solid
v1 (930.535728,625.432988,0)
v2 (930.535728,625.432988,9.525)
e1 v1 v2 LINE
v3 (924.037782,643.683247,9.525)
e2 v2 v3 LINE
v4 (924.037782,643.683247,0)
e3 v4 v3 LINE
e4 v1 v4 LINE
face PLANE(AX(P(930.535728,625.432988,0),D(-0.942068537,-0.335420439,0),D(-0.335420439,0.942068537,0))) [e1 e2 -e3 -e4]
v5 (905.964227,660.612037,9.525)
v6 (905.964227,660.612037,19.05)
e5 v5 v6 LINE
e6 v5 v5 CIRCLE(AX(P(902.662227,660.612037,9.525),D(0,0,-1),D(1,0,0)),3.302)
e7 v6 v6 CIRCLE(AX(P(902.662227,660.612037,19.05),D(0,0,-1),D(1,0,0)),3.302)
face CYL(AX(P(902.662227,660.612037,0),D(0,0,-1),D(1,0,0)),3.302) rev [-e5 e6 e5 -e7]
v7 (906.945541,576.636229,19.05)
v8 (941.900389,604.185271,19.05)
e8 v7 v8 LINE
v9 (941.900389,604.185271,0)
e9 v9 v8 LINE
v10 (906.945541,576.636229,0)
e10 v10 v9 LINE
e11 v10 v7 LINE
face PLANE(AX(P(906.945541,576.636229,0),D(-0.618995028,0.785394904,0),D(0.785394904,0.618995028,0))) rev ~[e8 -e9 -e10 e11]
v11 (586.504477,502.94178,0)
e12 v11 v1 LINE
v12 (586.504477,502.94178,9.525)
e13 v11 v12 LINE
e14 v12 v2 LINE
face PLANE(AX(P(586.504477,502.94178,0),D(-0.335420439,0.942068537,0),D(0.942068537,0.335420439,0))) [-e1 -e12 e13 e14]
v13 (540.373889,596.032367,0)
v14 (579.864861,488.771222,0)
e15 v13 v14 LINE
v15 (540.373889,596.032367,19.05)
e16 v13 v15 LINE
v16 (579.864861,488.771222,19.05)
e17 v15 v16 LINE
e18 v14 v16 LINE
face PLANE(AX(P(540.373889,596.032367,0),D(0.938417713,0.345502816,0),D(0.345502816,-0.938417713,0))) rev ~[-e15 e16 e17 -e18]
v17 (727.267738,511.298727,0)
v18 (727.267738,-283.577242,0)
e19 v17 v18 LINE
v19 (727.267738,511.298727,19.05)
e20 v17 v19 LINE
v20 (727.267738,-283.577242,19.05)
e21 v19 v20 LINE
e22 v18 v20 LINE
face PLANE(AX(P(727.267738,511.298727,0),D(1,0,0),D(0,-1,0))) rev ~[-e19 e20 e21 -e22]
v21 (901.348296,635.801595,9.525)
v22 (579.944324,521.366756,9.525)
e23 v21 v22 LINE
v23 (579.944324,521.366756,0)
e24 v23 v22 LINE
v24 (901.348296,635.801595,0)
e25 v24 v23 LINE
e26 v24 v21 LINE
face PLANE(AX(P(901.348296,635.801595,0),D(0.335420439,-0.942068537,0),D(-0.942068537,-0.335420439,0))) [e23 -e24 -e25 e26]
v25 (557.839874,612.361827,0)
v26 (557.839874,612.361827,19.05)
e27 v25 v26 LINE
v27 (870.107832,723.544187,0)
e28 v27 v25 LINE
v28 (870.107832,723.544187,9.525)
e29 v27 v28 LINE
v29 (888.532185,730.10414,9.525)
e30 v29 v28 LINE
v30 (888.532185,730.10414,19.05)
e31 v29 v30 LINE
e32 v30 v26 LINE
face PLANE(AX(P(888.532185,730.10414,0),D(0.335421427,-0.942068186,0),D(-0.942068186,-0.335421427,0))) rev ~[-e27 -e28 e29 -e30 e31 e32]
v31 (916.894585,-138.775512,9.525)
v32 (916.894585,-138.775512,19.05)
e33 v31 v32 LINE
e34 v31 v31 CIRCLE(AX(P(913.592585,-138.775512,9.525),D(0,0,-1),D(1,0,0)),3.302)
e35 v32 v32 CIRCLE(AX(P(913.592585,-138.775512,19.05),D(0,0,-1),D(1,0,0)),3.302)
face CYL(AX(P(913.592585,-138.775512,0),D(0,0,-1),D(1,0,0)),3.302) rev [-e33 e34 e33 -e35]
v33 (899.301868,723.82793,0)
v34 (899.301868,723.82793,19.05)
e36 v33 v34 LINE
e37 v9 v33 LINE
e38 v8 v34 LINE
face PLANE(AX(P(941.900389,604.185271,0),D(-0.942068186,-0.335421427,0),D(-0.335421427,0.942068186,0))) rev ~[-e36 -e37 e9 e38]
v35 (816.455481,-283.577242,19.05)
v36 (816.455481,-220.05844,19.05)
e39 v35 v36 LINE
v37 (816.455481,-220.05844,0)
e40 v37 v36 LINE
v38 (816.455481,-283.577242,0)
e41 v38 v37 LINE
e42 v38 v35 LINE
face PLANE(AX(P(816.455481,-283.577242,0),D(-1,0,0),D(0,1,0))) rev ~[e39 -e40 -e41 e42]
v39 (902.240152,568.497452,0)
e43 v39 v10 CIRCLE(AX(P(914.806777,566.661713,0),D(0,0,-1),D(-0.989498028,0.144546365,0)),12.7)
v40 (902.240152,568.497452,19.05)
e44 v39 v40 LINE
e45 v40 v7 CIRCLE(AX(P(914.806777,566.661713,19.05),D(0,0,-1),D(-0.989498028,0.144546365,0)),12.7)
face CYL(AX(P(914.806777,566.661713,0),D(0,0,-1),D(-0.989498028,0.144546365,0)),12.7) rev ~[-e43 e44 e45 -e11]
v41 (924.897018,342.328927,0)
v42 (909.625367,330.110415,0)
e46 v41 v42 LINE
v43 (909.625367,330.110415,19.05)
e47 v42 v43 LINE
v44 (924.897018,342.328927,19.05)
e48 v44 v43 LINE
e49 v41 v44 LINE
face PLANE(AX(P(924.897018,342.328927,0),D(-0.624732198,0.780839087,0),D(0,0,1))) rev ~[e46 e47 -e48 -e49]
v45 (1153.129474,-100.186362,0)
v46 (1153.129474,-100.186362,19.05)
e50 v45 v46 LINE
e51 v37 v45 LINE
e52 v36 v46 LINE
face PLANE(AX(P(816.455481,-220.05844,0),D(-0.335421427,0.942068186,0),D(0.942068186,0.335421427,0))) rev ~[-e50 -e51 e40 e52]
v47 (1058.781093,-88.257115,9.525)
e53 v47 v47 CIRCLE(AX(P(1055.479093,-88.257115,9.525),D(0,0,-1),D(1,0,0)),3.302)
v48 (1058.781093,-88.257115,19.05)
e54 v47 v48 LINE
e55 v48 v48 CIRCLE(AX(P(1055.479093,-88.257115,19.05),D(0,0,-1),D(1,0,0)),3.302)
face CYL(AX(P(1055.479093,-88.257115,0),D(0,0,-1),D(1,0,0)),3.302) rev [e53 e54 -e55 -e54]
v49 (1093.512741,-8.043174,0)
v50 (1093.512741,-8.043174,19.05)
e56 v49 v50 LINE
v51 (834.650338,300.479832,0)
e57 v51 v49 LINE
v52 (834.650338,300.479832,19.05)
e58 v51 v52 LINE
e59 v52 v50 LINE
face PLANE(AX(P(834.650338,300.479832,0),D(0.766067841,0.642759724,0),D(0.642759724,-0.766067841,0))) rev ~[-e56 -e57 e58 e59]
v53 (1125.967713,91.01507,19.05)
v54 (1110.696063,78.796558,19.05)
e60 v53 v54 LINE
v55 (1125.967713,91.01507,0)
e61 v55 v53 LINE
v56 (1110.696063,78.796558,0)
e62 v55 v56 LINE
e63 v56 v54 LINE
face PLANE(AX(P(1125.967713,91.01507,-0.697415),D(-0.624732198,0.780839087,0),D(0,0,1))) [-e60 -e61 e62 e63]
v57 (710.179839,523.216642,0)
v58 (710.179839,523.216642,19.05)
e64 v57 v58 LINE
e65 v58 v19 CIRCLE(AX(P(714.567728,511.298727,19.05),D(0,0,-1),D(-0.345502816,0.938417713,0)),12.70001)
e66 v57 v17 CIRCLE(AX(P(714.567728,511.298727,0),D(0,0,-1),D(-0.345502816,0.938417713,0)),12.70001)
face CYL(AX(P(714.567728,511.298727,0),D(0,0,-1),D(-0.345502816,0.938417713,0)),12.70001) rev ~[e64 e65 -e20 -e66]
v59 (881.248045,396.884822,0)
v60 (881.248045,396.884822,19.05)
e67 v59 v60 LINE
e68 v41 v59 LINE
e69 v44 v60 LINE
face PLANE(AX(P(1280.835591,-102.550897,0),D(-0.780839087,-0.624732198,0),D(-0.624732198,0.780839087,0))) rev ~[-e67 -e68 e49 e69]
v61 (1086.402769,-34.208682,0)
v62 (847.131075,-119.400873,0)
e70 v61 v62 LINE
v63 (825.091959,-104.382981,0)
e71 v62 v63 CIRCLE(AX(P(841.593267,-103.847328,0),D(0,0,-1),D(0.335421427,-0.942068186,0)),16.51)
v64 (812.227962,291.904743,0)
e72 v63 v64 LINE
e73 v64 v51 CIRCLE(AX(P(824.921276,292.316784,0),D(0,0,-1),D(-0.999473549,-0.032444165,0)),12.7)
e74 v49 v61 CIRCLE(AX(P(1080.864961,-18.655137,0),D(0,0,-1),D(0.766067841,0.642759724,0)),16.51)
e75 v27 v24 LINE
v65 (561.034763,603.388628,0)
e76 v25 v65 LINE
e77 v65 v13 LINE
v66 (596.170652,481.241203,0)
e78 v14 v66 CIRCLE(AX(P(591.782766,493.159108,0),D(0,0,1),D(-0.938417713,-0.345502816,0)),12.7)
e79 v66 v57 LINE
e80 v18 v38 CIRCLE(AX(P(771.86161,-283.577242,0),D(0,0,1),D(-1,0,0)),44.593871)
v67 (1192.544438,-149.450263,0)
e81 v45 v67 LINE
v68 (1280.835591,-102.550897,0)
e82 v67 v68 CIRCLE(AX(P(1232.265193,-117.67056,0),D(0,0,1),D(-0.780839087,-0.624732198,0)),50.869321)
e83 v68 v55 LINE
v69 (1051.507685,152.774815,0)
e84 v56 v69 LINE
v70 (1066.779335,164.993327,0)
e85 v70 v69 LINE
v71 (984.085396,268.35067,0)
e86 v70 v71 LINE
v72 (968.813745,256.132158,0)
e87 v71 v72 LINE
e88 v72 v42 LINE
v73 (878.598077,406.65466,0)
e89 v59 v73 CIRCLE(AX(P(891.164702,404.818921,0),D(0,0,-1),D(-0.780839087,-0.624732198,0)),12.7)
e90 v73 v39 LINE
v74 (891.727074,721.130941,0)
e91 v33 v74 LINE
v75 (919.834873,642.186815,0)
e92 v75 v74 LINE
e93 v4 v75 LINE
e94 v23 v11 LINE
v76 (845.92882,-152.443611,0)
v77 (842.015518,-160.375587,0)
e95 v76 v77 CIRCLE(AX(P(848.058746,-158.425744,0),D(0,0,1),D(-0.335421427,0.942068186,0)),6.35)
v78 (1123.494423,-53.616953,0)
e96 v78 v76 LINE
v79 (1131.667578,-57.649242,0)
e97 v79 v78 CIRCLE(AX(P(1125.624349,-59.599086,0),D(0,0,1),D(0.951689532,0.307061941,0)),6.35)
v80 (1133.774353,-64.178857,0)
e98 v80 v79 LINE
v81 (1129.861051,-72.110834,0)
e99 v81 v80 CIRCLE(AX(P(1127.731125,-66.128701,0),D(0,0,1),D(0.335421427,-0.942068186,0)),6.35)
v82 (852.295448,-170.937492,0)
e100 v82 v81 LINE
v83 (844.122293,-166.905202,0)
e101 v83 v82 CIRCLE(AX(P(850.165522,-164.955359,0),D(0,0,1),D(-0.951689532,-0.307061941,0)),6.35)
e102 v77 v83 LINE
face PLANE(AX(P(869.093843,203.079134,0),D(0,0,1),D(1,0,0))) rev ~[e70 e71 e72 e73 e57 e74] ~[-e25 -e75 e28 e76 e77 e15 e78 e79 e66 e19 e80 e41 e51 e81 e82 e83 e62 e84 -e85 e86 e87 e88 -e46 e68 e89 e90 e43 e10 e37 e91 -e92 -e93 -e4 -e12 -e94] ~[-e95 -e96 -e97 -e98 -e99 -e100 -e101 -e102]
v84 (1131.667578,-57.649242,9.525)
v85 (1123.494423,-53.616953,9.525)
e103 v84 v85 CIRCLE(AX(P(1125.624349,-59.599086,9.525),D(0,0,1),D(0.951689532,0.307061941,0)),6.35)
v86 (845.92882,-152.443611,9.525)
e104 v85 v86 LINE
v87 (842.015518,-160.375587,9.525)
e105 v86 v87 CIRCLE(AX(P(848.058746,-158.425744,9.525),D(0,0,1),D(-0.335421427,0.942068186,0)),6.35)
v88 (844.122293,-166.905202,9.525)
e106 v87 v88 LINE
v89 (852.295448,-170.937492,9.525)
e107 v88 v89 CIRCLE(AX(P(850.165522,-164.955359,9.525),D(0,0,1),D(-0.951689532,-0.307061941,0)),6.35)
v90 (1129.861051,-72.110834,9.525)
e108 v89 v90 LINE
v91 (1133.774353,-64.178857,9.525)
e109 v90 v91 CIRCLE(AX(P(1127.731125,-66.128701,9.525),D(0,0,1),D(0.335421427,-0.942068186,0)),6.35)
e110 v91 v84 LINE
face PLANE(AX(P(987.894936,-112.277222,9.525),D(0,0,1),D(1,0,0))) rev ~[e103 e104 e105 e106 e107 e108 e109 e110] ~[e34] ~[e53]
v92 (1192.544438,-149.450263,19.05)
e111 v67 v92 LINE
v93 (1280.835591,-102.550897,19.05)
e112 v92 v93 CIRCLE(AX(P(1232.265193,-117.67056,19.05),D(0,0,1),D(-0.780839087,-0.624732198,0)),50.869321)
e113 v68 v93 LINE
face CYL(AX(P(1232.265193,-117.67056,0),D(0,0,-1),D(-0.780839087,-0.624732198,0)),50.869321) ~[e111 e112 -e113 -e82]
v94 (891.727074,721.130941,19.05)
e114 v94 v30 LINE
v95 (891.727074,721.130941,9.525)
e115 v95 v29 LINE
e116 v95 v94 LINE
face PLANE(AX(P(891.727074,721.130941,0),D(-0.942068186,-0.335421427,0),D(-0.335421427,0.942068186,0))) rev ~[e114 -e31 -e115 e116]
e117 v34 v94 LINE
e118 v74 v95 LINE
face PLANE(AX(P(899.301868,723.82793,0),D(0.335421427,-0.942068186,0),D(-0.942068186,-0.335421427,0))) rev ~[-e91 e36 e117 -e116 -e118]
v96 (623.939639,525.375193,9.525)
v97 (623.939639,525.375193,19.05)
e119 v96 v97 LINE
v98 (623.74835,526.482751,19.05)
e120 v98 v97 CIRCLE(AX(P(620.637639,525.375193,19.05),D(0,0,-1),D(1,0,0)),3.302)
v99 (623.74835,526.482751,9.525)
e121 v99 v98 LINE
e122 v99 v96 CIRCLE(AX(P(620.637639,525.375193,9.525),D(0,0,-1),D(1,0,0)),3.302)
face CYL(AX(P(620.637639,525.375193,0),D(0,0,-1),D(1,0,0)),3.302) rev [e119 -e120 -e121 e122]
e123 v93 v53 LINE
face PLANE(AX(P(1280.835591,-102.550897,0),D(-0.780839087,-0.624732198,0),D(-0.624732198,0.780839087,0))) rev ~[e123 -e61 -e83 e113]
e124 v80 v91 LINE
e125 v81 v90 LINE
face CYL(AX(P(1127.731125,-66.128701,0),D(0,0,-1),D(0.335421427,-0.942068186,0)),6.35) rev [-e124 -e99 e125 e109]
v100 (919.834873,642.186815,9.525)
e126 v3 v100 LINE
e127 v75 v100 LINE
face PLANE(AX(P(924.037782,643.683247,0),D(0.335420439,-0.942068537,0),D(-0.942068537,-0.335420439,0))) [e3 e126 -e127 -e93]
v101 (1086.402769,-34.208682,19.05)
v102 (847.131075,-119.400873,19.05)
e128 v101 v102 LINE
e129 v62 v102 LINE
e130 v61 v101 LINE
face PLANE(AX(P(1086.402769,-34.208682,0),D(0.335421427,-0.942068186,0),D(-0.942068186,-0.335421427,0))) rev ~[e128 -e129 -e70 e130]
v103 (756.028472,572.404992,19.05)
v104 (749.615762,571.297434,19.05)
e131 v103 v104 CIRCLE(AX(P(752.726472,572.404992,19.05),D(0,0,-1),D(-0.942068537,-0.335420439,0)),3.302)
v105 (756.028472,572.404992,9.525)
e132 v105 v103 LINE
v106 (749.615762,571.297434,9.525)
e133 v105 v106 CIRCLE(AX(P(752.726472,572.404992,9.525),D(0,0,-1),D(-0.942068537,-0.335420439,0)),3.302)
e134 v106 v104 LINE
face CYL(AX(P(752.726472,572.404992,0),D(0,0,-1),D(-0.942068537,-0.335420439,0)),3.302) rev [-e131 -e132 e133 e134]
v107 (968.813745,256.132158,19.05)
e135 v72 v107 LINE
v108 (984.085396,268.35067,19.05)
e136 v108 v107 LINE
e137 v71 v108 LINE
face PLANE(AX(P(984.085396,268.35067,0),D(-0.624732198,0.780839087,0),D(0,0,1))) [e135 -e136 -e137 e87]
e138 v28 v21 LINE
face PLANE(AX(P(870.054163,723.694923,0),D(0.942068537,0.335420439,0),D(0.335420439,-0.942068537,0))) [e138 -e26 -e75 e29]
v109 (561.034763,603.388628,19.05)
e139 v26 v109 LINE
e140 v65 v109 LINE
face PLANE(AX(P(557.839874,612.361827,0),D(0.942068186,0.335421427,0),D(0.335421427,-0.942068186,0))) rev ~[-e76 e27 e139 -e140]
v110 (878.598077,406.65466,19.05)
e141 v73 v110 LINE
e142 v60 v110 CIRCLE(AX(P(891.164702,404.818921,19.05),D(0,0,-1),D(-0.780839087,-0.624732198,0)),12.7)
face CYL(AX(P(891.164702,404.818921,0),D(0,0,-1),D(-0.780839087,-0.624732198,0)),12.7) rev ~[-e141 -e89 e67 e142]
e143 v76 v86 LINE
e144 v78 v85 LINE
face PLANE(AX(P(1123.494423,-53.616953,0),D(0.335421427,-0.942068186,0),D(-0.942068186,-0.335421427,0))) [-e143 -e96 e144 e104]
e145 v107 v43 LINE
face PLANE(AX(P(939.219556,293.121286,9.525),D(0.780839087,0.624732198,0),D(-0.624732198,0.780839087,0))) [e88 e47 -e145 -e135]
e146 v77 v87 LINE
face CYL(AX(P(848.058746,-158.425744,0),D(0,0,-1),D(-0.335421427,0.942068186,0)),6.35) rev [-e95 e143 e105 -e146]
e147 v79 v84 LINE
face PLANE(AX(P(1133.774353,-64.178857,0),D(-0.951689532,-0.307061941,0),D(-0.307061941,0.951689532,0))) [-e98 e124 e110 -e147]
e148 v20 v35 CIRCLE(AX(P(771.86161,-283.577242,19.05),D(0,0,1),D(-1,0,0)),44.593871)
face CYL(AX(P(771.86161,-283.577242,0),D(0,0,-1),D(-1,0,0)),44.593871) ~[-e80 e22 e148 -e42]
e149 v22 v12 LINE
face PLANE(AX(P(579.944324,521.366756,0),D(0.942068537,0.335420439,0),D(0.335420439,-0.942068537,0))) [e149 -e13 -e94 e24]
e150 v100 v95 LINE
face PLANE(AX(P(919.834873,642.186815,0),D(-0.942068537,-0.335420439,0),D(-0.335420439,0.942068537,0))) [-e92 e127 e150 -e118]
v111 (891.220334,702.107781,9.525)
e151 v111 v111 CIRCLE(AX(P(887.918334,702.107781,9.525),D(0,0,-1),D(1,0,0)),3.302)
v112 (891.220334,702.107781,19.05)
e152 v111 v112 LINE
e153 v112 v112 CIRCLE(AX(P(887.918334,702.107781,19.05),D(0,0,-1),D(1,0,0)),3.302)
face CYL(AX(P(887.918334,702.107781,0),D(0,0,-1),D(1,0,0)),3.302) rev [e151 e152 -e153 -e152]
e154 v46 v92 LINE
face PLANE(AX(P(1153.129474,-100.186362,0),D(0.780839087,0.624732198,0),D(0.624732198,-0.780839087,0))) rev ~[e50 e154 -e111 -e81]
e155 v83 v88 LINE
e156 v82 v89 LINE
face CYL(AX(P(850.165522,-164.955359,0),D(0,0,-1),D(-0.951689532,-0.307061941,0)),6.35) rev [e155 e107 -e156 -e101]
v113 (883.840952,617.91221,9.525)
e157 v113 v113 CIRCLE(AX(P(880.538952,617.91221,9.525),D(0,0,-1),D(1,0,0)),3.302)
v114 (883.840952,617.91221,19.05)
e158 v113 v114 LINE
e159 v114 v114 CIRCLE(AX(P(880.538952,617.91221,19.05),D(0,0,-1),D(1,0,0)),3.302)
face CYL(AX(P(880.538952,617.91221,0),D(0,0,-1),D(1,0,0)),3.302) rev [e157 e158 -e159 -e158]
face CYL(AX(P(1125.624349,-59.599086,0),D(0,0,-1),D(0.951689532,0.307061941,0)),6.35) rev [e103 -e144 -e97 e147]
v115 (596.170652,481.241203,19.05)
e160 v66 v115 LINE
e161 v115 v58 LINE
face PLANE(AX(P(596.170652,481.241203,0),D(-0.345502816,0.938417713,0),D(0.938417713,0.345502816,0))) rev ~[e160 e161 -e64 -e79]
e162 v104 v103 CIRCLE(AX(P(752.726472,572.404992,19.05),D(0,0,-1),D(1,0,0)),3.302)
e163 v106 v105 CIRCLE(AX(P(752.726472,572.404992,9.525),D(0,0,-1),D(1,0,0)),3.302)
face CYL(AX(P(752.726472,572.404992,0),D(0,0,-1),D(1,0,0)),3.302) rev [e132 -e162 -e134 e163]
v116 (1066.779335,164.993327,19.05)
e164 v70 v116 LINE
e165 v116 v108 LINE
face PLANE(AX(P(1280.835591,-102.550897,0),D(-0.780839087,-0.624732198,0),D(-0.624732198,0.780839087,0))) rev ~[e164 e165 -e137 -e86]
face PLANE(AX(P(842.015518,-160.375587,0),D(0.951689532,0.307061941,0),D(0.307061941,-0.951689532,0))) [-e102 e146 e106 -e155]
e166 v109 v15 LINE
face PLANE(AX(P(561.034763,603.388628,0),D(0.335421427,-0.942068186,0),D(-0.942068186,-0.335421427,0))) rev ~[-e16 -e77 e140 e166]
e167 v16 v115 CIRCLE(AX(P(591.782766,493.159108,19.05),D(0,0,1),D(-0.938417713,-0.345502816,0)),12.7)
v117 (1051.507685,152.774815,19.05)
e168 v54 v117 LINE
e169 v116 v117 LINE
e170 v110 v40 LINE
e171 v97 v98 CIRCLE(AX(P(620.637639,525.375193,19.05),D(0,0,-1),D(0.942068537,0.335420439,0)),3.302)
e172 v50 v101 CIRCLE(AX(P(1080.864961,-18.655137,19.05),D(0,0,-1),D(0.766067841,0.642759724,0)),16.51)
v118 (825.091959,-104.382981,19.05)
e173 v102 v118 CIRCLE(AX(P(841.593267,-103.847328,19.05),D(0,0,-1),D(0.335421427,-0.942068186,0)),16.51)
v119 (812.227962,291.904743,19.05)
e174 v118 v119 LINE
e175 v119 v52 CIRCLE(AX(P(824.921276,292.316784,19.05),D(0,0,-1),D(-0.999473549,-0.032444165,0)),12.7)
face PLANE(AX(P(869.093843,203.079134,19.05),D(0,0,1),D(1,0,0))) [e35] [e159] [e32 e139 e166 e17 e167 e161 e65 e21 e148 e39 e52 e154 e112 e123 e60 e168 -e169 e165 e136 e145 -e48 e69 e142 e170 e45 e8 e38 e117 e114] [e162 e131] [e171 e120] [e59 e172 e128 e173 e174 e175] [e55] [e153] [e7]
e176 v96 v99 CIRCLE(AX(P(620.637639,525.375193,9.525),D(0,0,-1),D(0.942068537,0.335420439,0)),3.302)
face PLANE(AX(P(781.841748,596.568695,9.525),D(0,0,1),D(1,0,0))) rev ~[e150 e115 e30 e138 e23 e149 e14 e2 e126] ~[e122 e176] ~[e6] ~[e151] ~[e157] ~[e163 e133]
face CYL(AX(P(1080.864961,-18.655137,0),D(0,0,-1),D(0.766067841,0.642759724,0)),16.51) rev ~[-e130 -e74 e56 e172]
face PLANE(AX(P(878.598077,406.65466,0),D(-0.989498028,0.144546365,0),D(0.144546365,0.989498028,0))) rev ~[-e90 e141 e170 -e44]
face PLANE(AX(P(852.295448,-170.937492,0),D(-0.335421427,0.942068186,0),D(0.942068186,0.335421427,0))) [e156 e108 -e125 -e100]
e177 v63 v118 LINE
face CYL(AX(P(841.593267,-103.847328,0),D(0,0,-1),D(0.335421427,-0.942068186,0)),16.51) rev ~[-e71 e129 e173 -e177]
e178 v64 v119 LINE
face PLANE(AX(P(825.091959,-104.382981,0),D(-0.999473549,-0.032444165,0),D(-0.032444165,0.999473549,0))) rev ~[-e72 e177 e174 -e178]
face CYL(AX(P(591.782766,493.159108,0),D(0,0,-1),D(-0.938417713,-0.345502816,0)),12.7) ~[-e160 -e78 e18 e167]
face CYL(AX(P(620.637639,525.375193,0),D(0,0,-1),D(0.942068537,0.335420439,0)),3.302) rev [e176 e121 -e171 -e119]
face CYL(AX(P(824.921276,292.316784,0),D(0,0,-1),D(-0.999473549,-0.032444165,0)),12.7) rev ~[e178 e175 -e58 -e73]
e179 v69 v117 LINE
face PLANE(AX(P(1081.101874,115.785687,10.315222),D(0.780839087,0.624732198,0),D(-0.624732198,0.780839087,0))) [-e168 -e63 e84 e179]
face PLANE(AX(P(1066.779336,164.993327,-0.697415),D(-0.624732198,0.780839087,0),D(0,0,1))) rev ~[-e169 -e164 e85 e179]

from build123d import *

# Parameters (mm, degrees)
F1_DEPTH = 19.05
F3_DEPTH = 9.525
F5_DEPTH = 9.525
F6_W     = 94.742
F6_H     = 19.05
F6_H_2   = 22.0252738774
F7_DEPTH = 19.558
F8_R     = 3.302
F9_DEPTH = 19.051


# Not quite as in the source:
# - a feature names something its author has since deleted; it is built from what else it names


with BuildPart() as f1:
    # F0 (on Top) → F1 (new body)
    with BuildSketch(Plane.XY):
        with BuildLine():
            Line((727.2677384075, 427.9083177516), (727.2677384075, -283.5772421425))
            ThreePointArc((727.2677384075, -283.5772421425), (771.8616098047, -328.1711135397), (816.4554812019, -283.5772421425))
            Line((816.4554812019, -283.5772421425), (816.4554812019, -220.0584400703))
            Line((816.4554812019, -220.0584400703), (1153.129473529, -100.186362138))
            Line((1153.129473529, -100.186362138), (1192.5444383312, -149.4502630935))
            ThreePointArc((1192.5444383312, -149.4502630935), (1256.128693756, -162.5951765711), (1280.8355912672, -102.5508970465))
            Line((1280.8355912672, -102.5508970465), (881.2480453078, 396.8848219998))
            ThreePointArc((881.2480453078, 396.8848219998), (878.9075846932, 401.4943033077), (878.5980767553, 406.6546597539))
            Line((878.5980767553, 406.6546597539), (902.2401524871, 568.497452094))
            ThreePointArc((902.2401524871, 568.497452094), (903.8120375637, 573.0182606597), (906.9455405898, 576.6362285378))
            Line((906.9455405898, 576.6362285378), (941.9003890149, 604.1852707886))
            Line((941.9003890149, 604.1852707886), (899.3018677789, 723.8279303566))
            Line((899.3018677789, 723.8279303566), (891.7270738587, 721.1309406639))
            Line((891.7270738587, 721.1309406639), (888.532184766, 730.1041401315))
            Line((888.532184766, 730.1041401315), (557.8398737201, 612.361827435))
            Line((557.8398737201, 612.361827435), (561.0347628128, 603.3886279674))
            Line((561.0347628128, 603.3886279674), (540.3738890749, 596.0323666485))
            Line((540.3738890749, 596.0323666485), (579.864860977, 488.7712220609))
            ThreePointArc((579.864860977, 488.7712220609), (586.4582383014, 481.6291726364), (596.1706516981, 481.2412028737))
            Line((596.1706516981, 481.2412028737), (710.1798391165, 523.2166417359))
            ThreePointArc((710.1798391165, 523.2166417359), (721.8328511307, 521.7154565085), (727.2677384075, 511.2987273493))
            Line((727.2677384075, 511.2987273493), (727.2677384075, 427.9083177516))
        make_face()
        with BuildLine():
            ThreePointArc((847.13107515, -119.4008734987), (832.2962861388, -117.4908698033), (825.0919590872, -104.3829809246))
            Line((825.0919590872, -104.3829809246), (812.2279623998, 291.9047427935))
            ThreePointArc((812.2279623998, 291.9047427935), (820.3847868922, 304.1789193457), (834.6503380579, 300.4798321914))
            Line((834.6503380579, 300.4798321914), (1093.5127410116, -8.0431735903))
            ThreePointArc((1093.5127410116, -8.0431735903), (1096.7972352344, -22.9844248457), (1086.4027687189, -34.2086823816))
            Line((1086.4027687189, -34.2086823816), (847.13107515, -119.4008734987))
        make_face(mode=Mode.SUBTRACT)
    extrude(amount=F1_DEPTH)

    # F2 (on face) → F3 (cut)
    with BuildSketch(Plane.XY):
        with BuildLine():
            ThreePointArc((844.1222933391, -166.9052020902), (847.3560158569, -170.6500208272), (852.2954479263, -170.9374917442))
            Line((852.2954479263, -170.9374917442), (1129.8610507564, -72.1108335167))
            ThreePointArc((1129.8610507564, -72.1108335167), (1133.425786756, -68.9382065458), (1133.77435322, -64.1788572139))
            Line((1133.77435322, -64.1788572139), (1131.667577719, -57.6492424267))
            ThreePointArc((1131.667577719, -57.6492424267), (1128.4338552012, -53.9044236898), (1123.4944231318, -53.6169527728))
            Line((1123.4944231318, -53.6169527728), (845.9288203018, -152.4436110002))
            ThreePointArc((845.9288203018, -152.4436110002), (842.3640843021, -155.6162379711), (842.0155178382, -160.3755873031))
            Line((842.0155178382, -160.3755873031), (844.1222933391, -166.9052020902))
        make_face()
    extrude(amount=F3_DEPTH, mode=Mode.SUBTRACT)

    # F4 (on face) → F5 (cut)
    with BuildSketch(Plane.XY):
        Polygon((579.9443241227, 521.366756094), (586.5044770697, 502.9417796404), (930.5357275267, 625.4329875525), (924.0377818739, 643.6832473584), (919.8348729601, 642.1868153078), (891.7270738587, 721.1309406639), (888.532184766, 730.1041401315), (870.0541627522, 723.6949228268), (901.3482962404, 635.8015951388), align=None)
    extrude(amount=F5_DEPTH, mode=Mode.SUBTRACT)

    # F6 (on face) → F7 (cut)
    with BuildSketch(Plane(origin=(730.9119602838, 584.7866009261, 0), x_dir=(-0.6247321984, 0.7808390873, 0), z_dir=(0.7808390873, 0.6247321984, 0))):
        with Locations((-357.8801403508, 9.525)):
            Rectangle(F6_W, F6_H)
        with Locations((-584.9891603508, 10.3152221296)):
            Rectangle(F6_W, F6_H_2)
    extrude(amount=-F7_DEPTH, mode=Mode.SUBTRACT)

    # F8 (on face) → F9 (cut, through all)
    with BuildSketch(Plane.XY):
        with Locations((902.6622274527, 660.6120369276)):
            Circle(F8_R)
        with Locations((887.9183335175, 702.107780571)):
            Circle(F8_R)
        with Locations((880.5389518172, 617.9122097817)):
            Circle(F8_R)
        with BuildLine():
            ThreePointArc((623.7483495144, 526.4827509324), (617.3838130375, 524.8132146381), (623.9396392041, 525.3751926427))
            ThreePointArc((623.9396392041, 525.3751926427), (623.8914653707, 525.9371706472), (623.7483495144, 526.4827509324))
        make_face()
        with BuildLine():
            ThreePointArc((756.0284718398, 572.4049919407), (752.1644938352, 575.6588181073), (749.6157615295, 571.2974336509))
            ThreePointArc((749.6157615295, 571.2974336509), (753.2884498444, 569.1511657741), (756.0284718398, 572.4049919407))
        make_face()
        with Locations((1055.4790926394, -88.2571151612)):
            Circle(F8_R)
        with Locations((913.5925848765, -138.7755124943)):
            Circle(F8_R)
    extrude(amount=F9_DEPTH, mode=Mode.SUBTRACT)


solid = f1.part
